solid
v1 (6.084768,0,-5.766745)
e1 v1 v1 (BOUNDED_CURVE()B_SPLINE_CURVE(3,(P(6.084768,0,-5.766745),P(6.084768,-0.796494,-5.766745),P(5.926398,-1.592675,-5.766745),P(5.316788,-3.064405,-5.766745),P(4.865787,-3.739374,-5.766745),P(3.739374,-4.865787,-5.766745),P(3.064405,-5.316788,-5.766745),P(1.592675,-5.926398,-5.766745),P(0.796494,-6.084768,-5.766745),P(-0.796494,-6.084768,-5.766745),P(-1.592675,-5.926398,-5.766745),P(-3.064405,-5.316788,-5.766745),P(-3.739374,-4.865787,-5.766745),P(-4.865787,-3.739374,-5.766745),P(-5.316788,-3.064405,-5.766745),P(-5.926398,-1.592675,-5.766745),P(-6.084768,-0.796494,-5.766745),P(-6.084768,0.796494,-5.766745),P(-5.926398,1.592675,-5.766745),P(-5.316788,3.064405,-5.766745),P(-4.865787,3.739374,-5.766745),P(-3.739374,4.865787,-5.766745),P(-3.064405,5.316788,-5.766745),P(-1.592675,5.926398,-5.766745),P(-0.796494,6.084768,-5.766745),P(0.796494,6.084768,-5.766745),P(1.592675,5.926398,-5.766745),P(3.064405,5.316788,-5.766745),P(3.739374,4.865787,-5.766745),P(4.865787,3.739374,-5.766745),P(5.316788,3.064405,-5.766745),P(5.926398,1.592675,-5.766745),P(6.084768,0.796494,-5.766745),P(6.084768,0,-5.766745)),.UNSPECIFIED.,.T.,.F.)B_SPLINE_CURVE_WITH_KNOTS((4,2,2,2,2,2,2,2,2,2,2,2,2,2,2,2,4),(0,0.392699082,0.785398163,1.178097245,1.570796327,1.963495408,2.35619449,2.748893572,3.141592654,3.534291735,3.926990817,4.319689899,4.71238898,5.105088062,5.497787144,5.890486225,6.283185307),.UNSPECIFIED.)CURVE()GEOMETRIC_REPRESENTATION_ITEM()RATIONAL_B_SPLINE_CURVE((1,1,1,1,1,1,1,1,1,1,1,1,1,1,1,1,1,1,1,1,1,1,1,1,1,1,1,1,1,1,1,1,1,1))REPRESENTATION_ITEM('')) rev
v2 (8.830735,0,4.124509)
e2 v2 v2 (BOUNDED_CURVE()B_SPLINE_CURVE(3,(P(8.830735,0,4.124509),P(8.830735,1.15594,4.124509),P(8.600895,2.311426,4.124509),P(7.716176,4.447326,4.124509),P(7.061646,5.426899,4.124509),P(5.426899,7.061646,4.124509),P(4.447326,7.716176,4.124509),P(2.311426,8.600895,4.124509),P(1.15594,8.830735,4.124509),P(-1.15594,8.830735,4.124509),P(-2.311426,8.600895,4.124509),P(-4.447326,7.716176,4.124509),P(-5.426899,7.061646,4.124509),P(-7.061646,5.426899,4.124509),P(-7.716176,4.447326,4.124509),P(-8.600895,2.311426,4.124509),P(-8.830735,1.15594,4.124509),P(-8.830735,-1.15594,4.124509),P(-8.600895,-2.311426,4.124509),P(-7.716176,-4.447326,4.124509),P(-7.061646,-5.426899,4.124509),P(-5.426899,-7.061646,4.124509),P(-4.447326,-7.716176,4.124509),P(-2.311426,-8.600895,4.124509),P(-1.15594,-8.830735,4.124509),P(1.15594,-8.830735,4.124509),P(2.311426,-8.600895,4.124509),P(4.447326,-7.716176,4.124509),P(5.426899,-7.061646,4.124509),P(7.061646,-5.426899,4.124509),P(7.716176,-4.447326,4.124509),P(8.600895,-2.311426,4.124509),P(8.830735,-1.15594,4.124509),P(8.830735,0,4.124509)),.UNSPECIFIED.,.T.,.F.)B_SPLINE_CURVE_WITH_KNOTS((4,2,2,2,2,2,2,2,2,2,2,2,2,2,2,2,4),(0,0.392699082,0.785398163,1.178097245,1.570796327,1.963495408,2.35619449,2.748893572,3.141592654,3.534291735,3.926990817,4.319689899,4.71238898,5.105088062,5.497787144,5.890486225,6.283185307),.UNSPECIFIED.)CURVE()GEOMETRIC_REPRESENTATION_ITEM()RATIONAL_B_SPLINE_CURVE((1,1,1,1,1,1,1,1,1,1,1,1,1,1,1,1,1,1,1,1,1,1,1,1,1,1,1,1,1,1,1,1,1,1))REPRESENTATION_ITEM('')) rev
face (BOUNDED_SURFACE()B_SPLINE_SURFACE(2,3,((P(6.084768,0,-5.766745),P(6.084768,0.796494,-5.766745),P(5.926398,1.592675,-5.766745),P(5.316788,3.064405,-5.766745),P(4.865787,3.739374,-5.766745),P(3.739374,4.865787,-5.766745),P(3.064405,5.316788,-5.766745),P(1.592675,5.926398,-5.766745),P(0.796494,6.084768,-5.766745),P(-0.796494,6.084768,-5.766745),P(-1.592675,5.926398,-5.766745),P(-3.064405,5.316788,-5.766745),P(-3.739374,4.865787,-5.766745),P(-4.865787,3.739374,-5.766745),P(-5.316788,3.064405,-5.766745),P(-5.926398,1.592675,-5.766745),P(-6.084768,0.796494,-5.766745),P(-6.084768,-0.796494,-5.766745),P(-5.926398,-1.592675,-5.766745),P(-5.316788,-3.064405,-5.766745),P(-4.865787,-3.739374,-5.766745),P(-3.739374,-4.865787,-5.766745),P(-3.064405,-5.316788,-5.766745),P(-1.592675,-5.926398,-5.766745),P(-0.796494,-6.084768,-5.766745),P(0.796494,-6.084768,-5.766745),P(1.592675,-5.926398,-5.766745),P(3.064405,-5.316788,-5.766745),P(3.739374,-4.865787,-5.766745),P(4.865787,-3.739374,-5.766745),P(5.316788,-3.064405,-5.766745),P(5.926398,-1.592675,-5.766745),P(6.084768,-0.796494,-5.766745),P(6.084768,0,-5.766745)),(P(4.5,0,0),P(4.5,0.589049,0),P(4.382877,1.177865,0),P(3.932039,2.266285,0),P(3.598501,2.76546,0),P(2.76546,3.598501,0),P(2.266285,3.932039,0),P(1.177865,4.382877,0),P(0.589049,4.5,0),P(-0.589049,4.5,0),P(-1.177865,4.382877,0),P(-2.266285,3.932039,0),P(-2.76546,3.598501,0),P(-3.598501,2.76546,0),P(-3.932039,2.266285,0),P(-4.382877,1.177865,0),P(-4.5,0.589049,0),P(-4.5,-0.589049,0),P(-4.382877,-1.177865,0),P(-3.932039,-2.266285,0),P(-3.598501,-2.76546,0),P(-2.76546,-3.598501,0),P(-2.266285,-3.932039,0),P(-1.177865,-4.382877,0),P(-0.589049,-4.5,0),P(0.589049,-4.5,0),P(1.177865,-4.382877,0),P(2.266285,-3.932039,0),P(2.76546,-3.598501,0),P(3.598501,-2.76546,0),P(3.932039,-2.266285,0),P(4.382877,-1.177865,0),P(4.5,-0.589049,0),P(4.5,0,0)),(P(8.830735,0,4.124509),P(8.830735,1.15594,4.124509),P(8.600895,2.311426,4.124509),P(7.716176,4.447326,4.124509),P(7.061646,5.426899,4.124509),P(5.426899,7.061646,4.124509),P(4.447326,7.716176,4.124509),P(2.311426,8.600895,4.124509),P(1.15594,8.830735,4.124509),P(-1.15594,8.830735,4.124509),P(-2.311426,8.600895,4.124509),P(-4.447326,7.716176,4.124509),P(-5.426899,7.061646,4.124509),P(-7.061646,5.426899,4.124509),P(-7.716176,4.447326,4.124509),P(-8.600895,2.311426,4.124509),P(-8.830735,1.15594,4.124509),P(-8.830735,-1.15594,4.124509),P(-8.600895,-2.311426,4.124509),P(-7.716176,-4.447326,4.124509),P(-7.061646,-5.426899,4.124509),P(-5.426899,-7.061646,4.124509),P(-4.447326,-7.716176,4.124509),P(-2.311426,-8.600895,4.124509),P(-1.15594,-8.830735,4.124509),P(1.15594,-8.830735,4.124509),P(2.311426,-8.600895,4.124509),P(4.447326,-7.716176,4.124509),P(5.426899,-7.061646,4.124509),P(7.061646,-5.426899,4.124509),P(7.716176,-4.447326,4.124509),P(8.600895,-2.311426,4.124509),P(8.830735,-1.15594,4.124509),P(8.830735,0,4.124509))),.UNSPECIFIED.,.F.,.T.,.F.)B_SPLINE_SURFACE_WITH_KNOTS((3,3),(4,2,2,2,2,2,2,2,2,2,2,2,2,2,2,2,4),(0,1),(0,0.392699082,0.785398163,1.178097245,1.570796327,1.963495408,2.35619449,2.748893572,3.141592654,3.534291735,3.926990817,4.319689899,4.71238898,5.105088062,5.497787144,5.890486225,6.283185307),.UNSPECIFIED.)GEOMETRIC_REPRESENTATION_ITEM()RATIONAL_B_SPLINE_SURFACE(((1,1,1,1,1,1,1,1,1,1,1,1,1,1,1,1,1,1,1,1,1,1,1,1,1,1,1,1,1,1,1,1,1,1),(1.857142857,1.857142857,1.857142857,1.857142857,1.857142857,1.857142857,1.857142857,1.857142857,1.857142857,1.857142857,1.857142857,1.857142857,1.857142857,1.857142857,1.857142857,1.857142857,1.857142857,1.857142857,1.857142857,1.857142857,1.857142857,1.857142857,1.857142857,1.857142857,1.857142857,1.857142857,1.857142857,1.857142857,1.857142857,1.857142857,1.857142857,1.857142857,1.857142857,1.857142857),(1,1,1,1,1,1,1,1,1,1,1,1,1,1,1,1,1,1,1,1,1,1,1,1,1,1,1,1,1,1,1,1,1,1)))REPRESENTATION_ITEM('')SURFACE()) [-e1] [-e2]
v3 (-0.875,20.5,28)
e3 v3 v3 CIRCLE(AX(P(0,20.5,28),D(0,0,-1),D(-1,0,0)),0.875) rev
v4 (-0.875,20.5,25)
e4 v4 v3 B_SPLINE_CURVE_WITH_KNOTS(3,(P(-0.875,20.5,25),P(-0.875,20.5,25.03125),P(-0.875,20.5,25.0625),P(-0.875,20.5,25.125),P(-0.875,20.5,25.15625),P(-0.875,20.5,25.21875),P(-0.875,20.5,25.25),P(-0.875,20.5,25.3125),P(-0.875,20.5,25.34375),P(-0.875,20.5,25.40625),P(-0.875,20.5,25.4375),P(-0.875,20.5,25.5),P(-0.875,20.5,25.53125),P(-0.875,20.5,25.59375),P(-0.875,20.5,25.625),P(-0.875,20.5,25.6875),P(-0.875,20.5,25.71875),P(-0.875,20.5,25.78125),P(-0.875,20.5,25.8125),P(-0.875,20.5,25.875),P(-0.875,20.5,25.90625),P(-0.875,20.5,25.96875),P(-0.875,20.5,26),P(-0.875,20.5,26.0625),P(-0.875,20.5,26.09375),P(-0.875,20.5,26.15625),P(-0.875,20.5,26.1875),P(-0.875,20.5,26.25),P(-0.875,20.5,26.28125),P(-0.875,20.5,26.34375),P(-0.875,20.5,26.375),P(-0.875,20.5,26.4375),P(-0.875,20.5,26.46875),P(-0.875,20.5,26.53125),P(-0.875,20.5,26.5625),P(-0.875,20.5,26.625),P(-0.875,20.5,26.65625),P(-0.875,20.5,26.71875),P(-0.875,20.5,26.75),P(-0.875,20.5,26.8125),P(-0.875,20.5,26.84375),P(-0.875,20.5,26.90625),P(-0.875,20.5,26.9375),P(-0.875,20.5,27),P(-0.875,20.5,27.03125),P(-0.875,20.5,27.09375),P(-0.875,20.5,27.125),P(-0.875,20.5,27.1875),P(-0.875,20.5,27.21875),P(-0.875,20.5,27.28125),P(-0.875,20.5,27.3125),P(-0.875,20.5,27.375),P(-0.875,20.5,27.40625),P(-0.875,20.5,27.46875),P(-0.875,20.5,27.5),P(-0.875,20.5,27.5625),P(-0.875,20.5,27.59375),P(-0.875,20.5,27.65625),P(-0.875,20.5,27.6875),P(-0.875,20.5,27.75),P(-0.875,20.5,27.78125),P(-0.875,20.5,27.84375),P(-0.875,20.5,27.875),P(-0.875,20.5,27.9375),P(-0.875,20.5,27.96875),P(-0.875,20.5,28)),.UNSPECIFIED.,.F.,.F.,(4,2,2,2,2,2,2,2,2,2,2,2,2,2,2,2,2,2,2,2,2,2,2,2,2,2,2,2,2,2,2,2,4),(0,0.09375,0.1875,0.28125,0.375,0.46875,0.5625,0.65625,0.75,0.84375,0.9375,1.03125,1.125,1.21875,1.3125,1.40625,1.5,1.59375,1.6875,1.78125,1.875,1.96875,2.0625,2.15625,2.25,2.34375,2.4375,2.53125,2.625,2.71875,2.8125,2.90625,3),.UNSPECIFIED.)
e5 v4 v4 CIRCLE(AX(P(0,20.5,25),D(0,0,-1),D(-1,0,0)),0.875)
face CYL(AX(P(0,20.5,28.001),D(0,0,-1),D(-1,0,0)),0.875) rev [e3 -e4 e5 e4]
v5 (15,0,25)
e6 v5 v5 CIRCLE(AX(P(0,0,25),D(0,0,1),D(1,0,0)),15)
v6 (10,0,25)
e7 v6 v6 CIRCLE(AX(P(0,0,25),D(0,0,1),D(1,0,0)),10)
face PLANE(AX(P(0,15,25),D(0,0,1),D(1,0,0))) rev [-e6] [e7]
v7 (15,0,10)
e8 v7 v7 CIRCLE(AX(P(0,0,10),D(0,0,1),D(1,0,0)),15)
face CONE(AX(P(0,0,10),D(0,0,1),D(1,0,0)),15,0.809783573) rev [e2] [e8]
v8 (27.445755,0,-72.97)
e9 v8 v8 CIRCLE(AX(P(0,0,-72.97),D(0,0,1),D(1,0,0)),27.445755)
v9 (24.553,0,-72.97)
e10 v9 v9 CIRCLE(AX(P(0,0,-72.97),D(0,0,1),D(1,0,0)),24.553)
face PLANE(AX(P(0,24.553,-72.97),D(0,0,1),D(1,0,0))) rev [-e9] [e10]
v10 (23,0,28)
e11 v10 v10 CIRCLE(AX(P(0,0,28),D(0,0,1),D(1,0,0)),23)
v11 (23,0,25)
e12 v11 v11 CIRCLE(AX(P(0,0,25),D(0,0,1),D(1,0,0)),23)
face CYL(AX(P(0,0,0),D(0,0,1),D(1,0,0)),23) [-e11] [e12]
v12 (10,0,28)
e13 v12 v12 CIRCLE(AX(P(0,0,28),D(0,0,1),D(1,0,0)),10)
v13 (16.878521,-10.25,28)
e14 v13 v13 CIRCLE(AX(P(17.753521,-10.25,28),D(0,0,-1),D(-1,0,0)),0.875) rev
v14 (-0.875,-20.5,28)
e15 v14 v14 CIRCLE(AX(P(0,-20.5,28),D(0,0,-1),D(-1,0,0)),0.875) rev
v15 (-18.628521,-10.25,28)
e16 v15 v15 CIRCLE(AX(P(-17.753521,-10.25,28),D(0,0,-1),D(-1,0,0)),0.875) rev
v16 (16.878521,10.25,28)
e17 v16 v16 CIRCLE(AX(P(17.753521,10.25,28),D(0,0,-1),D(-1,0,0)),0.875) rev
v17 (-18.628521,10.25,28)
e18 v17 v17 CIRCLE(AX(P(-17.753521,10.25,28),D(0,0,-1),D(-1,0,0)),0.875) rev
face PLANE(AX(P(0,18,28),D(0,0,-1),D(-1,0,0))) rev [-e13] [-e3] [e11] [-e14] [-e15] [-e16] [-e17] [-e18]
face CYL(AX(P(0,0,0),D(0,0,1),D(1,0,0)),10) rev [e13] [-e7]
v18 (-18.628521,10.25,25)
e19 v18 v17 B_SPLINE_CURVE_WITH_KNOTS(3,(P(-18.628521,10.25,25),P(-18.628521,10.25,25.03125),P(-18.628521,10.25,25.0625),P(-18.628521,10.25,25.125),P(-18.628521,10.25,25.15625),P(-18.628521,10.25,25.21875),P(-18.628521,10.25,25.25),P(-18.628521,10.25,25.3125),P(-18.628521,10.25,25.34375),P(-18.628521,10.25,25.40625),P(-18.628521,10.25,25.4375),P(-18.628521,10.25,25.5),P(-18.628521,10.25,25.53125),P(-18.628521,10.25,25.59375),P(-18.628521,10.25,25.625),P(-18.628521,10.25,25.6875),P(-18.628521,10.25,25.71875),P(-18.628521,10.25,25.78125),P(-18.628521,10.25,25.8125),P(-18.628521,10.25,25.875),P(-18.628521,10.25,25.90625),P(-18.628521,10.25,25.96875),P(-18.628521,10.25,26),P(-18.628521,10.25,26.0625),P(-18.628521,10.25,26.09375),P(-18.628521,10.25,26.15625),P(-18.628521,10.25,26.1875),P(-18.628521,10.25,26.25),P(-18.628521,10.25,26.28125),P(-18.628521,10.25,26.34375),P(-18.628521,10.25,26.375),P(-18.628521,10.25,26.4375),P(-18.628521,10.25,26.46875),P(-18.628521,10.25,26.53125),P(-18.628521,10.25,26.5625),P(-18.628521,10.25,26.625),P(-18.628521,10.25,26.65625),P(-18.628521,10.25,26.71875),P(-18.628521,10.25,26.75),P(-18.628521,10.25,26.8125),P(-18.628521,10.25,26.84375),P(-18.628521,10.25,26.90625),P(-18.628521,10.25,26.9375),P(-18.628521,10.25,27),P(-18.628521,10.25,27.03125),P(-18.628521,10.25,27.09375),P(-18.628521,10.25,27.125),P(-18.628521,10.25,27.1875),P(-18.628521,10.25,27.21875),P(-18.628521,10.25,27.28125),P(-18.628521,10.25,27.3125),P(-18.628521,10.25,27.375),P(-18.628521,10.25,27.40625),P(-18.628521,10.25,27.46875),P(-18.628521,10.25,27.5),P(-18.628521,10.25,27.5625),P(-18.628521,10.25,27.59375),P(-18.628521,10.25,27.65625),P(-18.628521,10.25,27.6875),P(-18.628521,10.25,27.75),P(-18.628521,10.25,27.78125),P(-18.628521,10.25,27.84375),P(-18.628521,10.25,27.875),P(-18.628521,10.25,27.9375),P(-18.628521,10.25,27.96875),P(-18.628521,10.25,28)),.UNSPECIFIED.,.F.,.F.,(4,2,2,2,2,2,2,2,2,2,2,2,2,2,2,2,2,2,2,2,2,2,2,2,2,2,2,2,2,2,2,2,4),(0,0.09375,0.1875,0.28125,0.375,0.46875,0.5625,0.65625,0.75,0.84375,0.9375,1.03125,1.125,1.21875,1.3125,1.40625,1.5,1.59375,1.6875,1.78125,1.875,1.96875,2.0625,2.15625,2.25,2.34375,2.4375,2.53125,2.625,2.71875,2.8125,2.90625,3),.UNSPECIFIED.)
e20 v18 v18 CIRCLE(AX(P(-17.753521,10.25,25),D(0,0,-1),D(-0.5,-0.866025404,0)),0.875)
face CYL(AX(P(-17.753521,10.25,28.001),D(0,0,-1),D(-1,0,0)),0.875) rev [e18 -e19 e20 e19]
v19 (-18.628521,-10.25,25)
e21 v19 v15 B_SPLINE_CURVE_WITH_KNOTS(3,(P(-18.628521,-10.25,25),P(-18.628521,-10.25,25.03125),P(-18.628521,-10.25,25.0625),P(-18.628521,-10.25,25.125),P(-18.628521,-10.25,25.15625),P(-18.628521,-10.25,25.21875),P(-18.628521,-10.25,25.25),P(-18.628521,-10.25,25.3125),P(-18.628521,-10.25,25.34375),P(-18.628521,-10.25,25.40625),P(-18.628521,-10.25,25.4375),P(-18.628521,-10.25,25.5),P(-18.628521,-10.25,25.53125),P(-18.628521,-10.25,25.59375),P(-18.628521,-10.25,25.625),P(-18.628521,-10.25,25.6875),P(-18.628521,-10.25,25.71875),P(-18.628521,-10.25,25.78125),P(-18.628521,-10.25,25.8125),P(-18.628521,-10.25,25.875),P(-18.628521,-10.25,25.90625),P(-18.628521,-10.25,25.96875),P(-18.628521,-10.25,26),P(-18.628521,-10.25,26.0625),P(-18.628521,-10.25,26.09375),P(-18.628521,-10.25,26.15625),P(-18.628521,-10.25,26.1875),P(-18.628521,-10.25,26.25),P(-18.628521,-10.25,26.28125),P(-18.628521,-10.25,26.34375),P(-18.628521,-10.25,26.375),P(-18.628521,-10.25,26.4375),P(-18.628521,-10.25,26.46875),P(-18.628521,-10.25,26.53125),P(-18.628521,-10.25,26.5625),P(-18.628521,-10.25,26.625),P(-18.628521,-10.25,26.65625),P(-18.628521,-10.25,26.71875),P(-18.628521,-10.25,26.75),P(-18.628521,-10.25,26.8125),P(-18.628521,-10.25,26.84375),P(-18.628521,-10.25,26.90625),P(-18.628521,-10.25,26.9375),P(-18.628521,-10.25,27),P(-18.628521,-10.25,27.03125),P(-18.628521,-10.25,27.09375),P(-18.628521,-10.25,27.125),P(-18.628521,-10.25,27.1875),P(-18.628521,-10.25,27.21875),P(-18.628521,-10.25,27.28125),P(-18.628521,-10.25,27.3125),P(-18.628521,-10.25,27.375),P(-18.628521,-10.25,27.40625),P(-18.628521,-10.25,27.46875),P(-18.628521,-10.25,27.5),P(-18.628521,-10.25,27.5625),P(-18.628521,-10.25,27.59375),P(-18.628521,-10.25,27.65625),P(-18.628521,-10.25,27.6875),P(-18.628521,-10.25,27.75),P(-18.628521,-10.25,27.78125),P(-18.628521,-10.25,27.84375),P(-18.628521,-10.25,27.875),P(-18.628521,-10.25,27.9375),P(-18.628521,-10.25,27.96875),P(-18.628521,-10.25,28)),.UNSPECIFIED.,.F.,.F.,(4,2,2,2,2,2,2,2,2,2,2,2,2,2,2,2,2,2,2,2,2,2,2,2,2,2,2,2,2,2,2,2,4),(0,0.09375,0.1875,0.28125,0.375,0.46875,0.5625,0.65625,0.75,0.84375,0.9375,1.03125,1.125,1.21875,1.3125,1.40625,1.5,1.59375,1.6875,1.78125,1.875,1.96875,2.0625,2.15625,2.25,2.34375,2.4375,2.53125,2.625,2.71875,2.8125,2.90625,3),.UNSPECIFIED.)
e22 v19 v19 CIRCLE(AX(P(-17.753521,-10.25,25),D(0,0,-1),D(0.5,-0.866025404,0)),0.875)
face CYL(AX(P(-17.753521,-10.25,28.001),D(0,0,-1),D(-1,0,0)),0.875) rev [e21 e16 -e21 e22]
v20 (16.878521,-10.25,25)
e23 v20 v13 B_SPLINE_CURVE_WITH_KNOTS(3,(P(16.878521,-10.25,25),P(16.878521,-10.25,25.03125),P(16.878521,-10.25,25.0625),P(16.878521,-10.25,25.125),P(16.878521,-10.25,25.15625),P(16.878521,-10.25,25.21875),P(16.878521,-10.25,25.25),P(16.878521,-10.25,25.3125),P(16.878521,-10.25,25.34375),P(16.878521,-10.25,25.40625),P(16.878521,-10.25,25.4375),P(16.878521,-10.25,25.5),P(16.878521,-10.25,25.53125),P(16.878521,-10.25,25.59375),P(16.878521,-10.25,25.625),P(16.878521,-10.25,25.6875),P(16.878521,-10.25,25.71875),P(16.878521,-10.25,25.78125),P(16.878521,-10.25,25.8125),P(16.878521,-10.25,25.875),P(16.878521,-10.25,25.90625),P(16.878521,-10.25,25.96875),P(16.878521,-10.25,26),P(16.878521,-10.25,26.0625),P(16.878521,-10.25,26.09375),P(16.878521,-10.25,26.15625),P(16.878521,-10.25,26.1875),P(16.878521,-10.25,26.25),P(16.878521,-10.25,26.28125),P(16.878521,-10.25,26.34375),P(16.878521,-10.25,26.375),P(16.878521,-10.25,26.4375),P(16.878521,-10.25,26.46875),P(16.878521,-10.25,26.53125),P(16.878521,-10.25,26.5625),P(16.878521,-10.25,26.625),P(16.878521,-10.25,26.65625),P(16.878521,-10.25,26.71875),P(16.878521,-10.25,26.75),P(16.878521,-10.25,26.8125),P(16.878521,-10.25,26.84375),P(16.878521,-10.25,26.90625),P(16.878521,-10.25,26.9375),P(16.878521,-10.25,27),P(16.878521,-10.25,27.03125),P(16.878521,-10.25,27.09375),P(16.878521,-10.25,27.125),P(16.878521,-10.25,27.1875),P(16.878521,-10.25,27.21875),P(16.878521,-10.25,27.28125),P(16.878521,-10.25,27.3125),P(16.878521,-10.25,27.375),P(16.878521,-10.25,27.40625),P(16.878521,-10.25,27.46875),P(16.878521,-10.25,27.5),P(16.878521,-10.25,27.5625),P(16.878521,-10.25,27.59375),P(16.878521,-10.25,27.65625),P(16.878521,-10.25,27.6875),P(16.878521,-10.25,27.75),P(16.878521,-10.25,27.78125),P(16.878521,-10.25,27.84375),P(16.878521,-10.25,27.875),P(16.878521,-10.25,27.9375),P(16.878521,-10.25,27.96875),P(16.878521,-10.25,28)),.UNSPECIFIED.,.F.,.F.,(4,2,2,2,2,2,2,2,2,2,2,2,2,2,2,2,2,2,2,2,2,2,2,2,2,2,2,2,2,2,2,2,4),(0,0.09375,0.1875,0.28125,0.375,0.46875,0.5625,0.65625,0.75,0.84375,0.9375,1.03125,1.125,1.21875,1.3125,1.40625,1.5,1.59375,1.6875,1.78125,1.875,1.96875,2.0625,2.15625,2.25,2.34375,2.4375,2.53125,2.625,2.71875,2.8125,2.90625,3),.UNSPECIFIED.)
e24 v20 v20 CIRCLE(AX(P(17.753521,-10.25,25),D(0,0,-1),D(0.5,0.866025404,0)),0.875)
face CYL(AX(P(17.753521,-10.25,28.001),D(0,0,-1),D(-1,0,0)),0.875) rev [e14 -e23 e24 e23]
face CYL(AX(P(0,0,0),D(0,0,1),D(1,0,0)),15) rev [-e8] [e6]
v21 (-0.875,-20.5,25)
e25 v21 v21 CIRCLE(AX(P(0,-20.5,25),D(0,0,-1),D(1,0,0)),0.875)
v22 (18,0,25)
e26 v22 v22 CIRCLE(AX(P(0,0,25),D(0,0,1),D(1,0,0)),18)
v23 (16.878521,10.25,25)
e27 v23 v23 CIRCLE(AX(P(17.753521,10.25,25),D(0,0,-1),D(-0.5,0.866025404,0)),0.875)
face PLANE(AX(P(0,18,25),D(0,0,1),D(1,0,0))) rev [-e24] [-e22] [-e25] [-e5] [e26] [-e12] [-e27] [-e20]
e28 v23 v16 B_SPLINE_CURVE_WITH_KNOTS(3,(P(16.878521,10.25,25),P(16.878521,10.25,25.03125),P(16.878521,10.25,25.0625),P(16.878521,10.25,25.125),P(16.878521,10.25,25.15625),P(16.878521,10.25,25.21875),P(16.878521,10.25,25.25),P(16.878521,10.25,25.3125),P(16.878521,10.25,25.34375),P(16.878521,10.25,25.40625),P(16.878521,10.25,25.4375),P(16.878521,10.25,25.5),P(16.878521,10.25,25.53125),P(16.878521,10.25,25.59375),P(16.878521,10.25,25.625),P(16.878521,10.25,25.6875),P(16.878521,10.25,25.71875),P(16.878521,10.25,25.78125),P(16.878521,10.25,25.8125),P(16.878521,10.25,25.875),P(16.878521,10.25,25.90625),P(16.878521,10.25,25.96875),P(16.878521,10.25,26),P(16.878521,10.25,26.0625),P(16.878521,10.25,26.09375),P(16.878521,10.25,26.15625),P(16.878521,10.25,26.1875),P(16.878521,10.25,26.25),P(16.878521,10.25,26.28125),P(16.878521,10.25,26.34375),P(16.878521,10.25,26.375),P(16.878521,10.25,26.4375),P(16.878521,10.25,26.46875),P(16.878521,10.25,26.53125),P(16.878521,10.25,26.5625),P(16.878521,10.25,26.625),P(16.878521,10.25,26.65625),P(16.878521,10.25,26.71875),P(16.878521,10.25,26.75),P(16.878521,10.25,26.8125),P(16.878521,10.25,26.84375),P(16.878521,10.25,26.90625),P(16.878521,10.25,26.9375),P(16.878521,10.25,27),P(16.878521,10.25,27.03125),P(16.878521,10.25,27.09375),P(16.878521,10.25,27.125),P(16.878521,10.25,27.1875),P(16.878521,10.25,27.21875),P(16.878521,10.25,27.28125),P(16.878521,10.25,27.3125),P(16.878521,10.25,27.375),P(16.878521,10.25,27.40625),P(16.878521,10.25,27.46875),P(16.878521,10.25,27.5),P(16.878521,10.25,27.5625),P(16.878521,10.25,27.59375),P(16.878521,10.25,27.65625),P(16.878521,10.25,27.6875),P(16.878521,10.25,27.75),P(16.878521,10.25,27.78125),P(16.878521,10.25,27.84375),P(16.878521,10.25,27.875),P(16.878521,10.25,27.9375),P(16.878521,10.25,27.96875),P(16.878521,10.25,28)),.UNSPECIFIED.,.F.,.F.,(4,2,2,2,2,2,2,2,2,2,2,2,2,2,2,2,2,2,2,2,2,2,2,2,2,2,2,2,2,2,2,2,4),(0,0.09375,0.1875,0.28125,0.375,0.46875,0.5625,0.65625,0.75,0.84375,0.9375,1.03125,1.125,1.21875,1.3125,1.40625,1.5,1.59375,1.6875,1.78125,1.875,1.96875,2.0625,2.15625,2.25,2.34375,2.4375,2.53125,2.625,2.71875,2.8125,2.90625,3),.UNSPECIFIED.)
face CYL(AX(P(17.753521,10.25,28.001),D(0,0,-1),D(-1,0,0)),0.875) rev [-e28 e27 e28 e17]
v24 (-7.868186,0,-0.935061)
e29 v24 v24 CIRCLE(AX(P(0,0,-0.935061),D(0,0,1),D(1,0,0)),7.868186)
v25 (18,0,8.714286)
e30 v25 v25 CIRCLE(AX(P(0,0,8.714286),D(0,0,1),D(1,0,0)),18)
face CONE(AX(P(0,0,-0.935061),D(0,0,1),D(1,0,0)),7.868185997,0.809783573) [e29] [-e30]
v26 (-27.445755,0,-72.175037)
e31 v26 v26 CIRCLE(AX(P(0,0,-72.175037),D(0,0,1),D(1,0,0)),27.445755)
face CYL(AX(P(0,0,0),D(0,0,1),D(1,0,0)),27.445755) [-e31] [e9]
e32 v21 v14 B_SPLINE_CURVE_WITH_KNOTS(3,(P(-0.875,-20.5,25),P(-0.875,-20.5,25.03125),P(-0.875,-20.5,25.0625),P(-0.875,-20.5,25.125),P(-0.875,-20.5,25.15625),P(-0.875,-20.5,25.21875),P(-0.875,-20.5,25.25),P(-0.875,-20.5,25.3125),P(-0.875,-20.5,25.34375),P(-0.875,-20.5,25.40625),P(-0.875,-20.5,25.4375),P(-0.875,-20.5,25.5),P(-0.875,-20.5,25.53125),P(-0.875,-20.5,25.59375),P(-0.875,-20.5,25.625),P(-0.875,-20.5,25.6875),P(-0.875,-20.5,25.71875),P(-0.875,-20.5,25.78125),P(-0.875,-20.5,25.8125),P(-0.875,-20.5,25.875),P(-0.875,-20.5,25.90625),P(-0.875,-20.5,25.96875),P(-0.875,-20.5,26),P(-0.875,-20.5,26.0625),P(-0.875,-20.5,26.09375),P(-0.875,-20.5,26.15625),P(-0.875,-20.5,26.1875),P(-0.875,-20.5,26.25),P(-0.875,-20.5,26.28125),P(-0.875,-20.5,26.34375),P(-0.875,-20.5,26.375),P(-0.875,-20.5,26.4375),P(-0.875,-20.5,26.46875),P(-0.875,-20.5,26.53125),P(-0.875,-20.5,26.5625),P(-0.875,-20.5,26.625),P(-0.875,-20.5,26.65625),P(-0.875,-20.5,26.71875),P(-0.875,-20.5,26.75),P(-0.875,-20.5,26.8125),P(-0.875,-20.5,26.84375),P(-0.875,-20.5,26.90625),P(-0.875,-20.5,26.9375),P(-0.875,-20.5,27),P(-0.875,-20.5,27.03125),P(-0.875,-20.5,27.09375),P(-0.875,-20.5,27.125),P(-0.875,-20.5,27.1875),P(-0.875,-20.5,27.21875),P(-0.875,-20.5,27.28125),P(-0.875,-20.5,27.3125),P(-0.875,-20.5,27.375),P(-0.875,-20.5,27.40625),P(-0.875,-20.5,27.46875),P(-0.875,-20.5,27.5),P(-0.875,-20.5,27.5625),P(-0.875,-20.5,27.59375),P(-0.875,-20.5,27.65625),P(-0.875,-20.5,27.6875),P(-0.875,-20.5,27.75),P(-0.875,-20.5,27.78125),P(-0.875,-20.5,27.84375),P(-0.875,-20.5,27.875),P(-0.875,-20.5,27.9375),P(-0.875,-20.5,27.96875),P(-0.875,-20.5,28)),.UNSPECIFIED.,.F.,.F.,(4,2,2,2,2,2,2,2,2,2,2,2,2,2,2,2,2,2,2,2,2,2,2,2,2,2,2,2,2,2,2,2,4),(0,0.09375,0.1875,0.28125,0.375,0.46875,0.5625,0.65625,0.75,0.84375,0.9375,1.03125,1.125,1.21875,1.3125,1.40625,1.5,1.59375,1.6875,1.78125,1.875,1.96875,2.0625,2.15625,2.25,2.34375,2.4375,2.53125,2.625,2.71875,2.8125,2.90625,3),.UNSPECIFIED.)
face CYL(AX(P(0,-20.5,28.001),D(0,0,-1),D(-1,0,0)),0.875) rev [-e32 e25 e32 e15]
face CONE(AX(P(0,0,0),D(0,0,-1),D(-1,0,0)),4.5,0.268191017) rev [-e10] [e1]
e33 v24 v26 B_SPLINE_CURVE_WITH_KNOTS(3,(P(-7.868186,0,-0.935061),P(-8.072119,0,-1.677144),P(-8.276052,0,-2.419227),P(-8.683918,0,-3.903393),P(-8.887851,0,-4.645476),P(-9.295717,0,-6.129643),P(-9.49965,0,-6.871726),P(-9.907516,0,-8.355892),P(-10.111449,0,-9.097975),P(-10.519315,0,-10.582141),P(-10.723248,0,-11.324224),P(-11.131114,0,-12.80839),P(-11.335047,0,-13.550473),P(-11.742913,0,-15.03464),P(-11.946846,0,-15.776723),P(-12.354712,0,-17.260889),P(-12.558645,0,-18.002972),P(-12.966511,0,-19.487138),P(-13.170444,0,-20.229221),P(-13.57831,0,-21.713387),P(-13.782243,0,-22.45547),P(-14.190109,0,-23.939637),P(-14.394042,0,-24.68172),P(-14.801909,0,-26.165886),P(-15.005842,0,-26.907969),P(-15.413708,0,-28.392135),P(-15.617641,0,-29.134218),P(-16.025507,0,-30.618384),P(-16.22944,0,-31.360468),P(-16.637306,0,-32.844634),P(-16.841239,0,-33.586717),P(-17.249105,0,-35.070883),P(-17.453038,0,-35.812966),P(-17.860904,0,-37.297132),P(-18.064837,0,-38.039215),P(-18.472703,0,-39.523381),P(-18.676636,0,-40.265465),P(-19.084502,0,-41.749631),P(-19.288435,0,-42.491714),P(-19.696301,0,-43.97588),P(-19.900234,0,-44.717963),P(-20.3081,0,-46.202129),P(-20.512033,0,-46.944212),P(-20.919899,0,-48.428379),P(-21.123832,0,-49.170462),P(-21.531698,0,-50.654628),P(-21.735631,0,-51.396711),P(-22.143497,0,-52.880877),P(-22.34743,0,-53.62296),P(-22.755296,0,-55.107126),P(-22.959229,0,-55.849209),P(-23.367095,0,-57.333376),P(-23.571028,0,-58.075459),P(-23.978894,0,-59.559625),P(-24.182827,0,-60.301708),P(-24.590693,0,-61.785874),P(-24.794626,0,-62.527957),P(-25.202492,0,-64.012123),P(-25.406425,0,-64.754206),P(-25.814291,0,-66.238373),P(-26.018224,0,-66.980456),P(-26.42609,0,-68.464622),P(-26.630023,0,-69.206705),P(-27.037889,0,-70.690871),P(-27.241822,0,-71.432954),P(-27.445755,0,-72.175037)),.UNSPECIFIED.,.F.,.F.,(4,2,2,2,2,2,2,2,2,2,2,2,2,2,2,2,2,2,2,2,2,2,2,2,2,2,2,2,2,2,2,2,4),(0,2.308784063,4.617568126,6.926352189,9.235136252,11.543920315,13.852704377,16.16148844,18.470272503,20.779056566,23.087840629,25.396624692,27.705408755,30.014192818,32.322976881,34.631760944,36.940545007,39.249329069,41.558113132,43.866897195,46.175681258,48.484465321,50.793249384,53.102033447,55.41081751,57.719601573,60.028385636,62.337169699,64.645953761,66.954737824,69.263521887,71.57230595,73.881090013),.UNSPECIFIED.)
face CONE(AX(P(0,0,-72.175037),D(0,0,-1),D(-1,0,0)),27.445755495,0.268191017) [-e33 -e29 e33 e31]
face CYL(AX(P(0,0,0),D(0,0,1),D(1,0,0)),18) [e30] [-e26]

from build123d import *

# Parameters (mm, degrees)
SKETCH2_R               = 0.875
BOLT_HOLE_DEPTH         = 3
BOLT_HOLE_PATTERN_COUNT = 6


with BuildPart() as part:
    # Nozzle base structure → Revolve1 (revolve)
    with BuildSketch(Plane(origin=(0, 0, 0), x_dir=(0, 0, -1), z_dir=(1, 0, 0)), mode=Mode.PRIVATE) as revolve1_sk:
        Polygon((0, 4.5), (72.97, 24.553), (72.97, 27.445755495), (72.175037331, 27.445755495), (0.935060955, 7.868185997), (-8.714285714, 18), (-25, 18), (-25, 23), (-28, 23), (-28, 18), (-28, 10), (-25, 10), (-25, 15), (-10, 15), align=None)
    revolve(revolve1_sk.sketch.rotate(Axis((0, 0, 0), (0, 0, -1)), 90), axis=Axis((0, 0, 0), (0, 0, -1)))

    # Throat
    # a fillet whose section is not a circle: 10 mm, written as the material it takes off along each edge
    with BuildSketch(Plane(origin=(0, 0, 0), x_dir=(1, 0, 0), z_dir=(0, 1, 0))) as throat_piece_1:
        with BuildLine():
            Bezier((6.08476834, 5.766745413), (4.5, 0), (8.830734933, -4.12450946), weights=[1, 1.857142857, 1])
            Line((8.830734933, -4.12450946), (4.5, 0))
            Line((4.5, 0), (6.08476834, 5.766745413))
        make_face()
    revolve(axis=Axis((0, 0, 0), (0, 0, -1)), mode=Mode.SUBTRACT)

    # Sketch2 → Bolt hole (cut)
    with BuildSketch(Plane(origin=(0, 0, 25), x_dir=(-1, 0, 0), z_dir=(0, 0, -1))):
        with Locations((0, 20.5)):
            Circle(SKETCH2_R)
    bolt_hole = extrude(amount=-BOLT_HOLE_DEPTH, mode=Mode.SUBTRACT)

    # Bolt hole pattern: Bolt hole ×6 about axis
    bolt_hole_pattern_axis = Axis((0, 0, 0), (0, 0, 1))
    for i in range(1, BOLT_HOLE_PATTERN_COUNT):
        add(bolt_hole.rotate(bolt_hole_pattern_axis, i * 360 / BOLT_HOLE_PATTERN_COUNT), mode=Mode.SUBTRACT)


solid = part.part
